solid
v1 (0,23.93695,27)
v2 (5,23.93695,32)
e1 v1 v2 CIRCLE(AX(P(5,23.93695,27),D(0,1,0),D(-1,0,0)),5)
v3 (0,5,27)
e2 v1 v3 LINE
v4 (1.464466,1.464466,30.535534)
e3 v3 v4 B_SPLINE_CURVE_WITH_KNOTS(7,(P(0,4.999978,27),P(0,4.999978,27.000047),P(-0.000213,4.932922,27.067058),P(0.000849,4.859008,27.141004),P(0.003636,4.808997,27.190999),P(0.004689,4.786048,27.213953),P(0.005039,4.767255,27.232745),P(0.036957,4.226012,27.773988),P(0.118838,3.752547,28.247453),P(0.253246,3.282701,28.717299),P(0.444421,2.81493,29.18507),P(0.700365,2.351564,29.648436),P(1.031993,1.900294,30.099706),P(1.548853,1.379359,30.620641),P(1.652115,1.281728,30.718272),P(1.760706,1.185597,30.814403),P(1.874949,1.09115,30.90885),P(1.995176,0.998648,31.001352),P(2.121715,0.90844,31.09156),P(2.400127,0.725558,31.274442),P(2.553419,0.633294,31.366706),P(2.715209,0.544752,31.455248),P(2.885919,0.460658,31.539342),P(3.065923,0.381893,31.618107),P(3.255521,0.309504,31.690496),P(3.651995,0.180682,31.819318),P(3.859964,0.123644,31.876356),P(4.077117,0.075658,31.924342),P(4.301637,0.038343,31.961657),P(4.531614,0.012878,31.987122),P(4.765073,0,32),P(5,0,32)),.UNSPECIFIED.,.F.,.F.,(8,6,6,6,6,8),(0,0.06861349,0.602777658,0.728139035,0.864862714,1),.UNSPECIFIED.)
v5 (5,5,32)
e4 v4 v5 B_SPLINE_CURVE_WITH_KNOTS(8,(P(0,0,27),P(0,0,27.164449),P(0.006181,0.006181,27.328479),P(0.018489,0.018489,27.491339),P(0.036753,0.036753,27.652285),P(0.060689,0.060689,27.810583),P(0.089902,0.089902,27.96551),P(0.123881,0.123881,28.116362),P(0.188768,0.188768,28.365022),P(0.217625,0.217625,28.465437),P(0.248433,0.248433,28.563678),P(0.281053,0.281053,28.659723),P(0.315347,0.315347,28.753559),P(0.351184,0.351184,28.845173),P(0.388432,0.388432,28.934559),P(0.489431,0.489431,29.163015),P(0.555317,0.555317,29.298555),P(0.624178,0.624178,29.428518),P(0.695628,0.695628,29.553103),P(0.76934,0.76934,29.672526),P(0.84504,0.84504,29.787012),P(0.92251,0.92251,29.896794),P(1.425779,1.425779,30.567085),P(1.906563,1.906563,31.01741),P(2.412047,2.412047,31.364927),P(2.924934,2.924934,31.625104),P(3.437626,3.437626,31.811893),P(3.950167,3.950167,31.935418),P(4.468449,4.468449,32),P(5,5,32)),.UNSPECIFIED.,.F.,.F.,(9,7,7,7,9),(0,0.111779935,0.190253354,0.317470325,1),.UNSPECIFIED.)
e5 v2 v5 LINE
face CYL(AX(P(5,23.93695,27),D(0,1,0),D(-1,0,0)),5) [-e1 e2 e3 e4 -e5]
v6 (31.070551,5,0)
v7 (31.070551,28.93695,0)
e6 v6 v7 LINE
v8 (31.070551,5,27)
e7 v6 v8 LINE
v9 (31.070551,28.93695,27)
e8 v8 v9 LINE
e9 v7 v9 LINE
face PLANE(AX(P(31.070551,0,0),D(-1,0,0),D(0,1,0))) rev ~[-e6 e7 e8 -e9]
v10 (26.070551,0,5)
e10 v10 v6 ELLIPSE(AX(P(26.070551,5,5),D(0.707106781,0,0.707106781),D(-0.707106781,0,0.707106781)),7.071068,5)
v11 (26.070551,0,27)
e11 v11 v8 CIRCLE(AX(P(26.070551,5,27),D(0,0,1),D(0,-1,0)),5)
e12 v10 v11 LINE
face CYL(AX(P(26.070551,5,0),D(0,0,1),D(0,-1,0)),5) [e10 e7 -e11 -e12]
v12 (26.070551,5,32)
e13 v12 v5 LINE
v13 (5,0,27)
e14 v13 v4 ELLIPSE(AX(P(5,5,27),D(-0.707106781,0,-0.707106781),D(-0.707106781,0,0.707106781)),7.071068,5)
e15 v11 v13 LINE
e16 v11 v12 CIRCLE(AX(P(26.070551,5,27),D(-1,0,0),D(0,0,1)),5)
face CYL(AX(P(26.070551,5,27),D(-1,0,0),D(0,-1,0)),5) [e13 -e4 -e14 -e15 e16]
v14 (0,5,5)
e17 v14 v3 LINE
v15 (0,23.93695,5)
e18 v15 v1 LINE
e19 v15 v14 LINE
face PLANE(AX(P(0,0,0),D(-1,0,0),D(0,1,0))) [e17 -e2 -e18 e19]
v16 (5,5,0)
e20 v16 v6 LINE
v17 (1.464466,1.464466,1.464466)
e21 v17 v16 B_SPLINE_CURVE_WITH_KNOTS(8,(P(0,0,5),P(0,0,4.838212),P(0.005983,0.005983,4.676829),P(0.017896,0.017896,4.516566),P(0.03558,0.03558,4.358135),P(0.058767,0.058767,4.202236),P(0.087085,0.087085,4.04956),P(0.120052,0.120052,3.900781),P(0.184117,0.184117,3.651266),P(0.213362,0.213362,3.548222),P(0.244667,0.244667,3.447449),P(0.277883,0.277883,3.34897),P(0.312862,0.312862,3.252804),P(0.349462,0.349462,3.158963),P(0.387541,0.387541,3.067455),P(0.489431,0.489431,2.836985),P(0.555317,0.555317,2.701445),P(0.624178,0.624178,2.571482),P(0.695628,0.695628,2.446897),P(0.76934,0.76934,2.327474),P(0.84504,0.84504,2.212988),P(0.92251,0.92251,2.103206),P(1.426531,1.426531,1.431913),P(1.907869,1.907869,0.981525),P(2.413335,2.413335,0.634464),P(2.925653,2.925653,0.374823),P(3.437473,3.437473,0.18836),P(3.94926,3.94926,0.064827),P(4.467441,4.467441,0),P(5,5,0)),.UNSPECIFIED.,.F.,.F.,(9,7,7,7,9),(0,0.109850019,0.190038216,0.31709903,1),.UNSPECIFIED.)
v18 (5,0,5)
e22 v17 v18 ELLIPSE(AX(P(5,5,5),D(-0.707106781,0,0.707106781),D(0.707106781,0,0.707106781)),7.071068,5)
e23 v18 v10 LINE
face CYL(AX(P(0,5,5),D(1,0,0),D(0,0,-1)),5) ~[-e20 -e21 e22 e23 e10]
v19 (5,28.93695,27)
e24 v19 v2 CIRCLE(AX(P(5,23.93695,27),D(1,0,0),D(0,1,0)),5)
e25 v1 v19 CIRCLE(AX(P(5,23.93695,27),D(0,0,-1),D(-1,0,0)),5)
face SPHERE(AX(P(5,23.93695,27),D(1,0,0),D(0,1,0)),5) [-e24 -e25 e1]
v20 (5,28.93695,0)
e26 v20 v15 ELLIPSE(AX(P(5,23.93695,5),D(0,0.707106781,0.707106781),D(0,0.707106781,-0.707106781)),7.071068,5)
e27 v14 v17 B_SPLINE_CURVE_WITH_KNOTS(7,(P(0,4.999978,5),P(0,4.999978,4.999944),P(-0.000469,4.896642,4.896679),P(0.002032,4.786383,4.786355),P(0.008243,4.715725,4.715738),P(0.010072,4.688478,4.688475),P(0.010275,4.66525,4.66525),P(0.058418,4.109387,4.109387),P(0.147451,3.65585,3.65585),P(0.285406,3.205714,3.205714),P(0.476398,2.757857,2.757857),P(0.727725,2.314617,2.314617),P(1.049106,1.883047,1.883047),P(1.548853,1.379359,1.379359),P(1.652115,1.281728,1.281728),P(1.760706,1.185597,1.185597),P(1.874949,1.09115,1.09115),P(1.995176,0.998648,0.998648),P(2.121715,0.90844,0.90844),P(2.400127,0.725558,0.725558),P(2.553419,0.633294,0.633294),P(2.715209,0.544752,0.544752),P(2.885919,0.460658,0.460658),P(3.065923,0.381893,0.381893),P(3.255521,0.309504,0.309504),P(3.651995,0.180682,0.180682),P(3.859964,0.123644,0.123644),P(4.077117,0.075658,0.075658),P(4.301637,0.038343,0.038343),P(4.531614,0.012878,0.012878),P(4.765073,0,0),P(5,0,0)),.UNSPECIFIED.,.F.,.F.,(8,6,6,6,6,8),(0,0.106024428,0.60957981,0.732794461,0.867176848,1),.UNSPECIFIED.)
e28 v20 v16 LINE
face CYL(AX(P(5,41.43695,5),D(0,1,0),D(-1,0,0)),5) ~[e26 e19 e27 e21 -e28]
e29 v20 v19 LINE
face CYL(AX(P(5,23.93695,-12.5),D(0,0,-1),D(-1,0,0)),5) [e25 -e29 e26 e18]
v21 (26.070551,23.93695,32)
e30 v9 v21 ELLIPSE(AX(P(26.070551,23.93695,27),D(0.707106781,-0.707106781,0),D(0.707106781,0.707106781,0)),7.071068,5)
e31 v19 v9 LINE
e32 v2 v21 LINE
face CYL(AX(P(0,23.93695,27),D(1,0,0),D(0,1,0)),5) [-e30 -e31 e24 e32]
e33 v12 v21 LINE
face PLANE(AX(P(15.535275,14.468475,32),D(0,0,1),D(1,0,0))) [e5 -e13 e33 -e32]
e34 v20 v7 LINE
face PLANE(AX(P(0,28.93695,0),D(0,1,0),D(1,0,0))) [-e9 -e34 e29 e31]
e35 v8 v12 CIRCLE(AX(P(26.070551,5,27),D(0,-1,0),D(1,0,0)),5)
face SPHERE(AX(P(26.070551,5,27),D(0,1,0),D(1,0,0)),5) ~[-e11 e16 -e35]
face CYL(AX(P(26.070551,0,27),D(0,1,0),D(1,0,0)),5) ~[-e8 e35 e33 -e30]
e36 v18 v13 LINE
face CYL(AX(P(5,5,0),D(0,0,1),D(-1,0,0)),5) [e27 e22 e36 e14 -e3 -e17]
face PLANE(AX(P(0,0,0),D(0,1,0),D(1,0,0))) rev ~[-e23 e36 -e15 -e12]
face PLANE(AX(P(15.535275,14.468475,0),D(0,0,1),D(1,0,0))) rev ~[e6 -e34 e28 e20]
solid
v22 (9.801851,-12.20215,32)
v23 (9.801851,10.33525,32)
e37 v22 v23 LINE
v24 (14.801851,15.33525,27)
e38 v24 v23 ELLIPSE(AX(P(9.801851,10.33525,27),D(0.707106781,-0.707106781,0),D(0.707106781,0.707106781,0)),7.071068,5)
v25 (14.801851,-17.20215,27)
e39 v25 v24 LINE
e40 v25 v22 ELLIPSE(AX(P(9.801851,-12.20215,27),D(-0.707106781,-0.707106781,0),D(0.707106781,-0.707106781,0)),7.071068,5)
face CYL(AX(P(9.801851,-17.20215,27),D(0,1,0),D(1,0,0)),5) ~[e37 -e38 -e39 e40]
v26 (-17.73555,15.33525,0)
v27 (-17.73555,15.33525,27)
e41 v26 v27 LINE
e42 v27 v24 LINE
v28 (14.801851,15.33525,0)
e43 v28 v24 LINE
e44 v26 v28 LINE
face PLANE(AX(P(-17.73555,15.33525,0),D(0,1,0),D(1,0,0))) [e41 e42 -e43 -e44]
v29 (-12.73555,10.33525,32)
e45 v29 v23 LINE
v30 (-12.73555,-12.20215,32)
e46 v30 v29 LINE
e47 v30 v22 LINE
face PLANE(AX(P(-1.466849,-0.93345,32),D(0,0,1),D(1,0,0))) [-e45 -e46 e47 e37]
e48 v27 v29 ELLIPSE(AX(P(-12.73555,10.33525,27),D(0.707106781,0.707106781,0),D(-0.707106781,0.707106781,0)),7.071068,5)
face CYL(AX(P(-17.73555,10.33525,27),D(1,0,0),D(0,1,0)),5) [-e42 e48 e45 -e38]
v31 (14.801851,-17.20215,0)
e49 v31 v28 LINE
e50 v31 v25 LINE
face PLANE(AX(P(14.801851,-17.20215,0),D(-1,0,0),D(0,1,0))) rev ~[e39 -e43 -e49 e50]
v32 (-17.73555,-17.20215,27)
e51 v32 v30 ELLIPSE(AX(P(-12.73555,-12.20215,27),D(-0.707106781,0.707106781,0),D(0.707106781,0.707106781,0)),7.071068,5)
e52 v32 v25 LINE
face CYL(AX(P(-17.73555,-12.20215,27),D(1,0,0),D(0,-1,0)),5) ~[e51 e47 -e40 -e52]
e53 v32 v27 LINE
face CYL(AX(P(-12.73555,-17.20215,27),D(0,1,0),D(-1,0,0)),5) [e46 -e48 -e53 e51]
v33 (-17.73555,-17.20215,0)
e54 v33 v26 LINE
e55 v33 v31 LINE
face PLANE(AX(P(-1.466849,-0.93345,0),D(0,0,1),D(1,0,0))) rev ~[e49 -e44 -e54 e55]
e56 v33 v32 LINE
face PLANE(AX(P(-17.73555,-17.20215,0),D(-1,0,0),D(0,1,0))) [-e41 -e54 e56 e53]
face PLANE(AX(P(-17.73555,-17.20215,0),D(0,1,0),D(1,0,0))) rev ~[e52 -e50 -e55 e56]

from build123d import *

# Parameters (mm, degrees)
F1_W        = 32.5374016538
F1_H        = 32.5373997912
F2_DEPTH    = 32
F0_W        = 31.0705509037
F0_H        = 28.9369504899
F3_R        = 5
F4_R        = 5
F5_T1_DEPTH = 48.9369504899
F5_T3_DEPTH = 39.5
F5_T5_DEPTH = 31.4369504899
F5_T8_ANGLE = 90
F6_R        = 5


# Not quite as in the source:
# - a fillet or chamfer that OpenCascade refuses, or shapes differently, is made with other operations: its cross-section is extruded or revolved along the edge and cut away or added


with BuildPart() as f2:
    # F1 (on Top) → F2 (new body)
    with BuildSketch(Plane.XY):
        with Locations((-1.4668493532, -0.933450181)):
            Rectangle(F1_W, F1_H)
    extrude(amount=F2_DEPTH)

    # F6
    f6_edges = [f2.edges().sort_by_distance(p)[0] for p in [
        (-1.466849, -17.20215, 32),
        (-17.73555, -0.93345, 32),
        (-1.466849, 15.33525, 32),
        (14.801851, -0.93345, 32),
    ]]
    fillet(f6_edges, radius=F6_R)


with BuildPart() as f2b:
    # F0 (on Top) → F2, piece 2 (new body)
    with BuildSketch(Plane.XY):
        with Locations((15.5352754518, 14.4684752449)):
            Rectangle(F0_W, F0_H)
    extrude(amount=F2_DEPTH)

    # F3
    f3_edges = [f2b.edges().sort_by_distance(p)[0] for p in [
        (15.535275, 28.93695, 32),
        (31.070551, 14.468475, 32),
    ]]
    fillet(f3_edges, radius=F3_R)

    # F4
    f4_edges = [f2b.edges().sort_by_distance(p)[0] for p in [
        (31.070551, 0, 13.5),
        (29.606085, 0, 30.535534),
        (15.535275, 0, 0),
        (13.035275, 0, 32),
        (0, 0, 16),
    ]]
    fillet(f4_edges, radius=F4_R)

    # F5: fillet of radius 5 on 5 edges, made by hand

    # F5_s2 → F5_t1 (cut)
    with BuildSketch(Plane.XZ.offset(-41.4369504899)):
        with BuildLine():
            ThreePointArc((0, 5), (1.4644660941, 1.4644660941), (5, 0))
            Line((5, 0), (0, 0))
            Line((0, 0), (0, 5))
        make_face()
    extrude(amount=F5_T1_DEPTH, mode=Mode.SUBTRACT)

    # F5_s4 → F5_t3 (cut)
    with BuildSketch(Plane.XY.offset(-12.5)):
        with BuildLine():
            ThreePointArc((0, 23.9369504899), (1.4644660941, 27.4724843958), (5, 28.9369504899))
            Line((5, 28.9369504899), (0, 28.9369504899))
            Line((0, 28.9369504899), (0, 23.9369504899))
        make_face()
    extrude(amount=F5_T3_DEPTH, mode=Mode.SUBTRACT)

    # F5_s6 → F5_t5 (cut)
    with BuildSketch(Plane.XZ.offset(-23.9369504899)):
        with BuildLine():
            ThreePointArc((0, 27), (1.4644660941, 30.5355339059), (5, 32))
            Line((5, 32), (0, 32))
            Line((0, 32), (0, 27))
        make_face()
    extrude(amount=F5_T5_DEPTH, mode=Mode.SUBTRACT)

    # F5_s7 → F5_t8 (revolve, cut)
    with BuildSketch(Plane.XY.offset(27)):
        with BuildLine():
            ThreePointArc((0, 23.9369504899), (1.4644660941, 27.4724843958), (5, 28.9369504899))
            Line((5, 28.9369504899), (0, 28.9369504899))
            Line((0, 28.9369504899), (0, 23.9369504899))
        make_face()
    revolve(axis=Axis((0, 23.9369504899, 27), (1, 0, 0)), revolution_arc=F5_T8_ANGLE, mode=Mode.SUBTRACT)


solid = Compound([f2.part, f2b.part])
